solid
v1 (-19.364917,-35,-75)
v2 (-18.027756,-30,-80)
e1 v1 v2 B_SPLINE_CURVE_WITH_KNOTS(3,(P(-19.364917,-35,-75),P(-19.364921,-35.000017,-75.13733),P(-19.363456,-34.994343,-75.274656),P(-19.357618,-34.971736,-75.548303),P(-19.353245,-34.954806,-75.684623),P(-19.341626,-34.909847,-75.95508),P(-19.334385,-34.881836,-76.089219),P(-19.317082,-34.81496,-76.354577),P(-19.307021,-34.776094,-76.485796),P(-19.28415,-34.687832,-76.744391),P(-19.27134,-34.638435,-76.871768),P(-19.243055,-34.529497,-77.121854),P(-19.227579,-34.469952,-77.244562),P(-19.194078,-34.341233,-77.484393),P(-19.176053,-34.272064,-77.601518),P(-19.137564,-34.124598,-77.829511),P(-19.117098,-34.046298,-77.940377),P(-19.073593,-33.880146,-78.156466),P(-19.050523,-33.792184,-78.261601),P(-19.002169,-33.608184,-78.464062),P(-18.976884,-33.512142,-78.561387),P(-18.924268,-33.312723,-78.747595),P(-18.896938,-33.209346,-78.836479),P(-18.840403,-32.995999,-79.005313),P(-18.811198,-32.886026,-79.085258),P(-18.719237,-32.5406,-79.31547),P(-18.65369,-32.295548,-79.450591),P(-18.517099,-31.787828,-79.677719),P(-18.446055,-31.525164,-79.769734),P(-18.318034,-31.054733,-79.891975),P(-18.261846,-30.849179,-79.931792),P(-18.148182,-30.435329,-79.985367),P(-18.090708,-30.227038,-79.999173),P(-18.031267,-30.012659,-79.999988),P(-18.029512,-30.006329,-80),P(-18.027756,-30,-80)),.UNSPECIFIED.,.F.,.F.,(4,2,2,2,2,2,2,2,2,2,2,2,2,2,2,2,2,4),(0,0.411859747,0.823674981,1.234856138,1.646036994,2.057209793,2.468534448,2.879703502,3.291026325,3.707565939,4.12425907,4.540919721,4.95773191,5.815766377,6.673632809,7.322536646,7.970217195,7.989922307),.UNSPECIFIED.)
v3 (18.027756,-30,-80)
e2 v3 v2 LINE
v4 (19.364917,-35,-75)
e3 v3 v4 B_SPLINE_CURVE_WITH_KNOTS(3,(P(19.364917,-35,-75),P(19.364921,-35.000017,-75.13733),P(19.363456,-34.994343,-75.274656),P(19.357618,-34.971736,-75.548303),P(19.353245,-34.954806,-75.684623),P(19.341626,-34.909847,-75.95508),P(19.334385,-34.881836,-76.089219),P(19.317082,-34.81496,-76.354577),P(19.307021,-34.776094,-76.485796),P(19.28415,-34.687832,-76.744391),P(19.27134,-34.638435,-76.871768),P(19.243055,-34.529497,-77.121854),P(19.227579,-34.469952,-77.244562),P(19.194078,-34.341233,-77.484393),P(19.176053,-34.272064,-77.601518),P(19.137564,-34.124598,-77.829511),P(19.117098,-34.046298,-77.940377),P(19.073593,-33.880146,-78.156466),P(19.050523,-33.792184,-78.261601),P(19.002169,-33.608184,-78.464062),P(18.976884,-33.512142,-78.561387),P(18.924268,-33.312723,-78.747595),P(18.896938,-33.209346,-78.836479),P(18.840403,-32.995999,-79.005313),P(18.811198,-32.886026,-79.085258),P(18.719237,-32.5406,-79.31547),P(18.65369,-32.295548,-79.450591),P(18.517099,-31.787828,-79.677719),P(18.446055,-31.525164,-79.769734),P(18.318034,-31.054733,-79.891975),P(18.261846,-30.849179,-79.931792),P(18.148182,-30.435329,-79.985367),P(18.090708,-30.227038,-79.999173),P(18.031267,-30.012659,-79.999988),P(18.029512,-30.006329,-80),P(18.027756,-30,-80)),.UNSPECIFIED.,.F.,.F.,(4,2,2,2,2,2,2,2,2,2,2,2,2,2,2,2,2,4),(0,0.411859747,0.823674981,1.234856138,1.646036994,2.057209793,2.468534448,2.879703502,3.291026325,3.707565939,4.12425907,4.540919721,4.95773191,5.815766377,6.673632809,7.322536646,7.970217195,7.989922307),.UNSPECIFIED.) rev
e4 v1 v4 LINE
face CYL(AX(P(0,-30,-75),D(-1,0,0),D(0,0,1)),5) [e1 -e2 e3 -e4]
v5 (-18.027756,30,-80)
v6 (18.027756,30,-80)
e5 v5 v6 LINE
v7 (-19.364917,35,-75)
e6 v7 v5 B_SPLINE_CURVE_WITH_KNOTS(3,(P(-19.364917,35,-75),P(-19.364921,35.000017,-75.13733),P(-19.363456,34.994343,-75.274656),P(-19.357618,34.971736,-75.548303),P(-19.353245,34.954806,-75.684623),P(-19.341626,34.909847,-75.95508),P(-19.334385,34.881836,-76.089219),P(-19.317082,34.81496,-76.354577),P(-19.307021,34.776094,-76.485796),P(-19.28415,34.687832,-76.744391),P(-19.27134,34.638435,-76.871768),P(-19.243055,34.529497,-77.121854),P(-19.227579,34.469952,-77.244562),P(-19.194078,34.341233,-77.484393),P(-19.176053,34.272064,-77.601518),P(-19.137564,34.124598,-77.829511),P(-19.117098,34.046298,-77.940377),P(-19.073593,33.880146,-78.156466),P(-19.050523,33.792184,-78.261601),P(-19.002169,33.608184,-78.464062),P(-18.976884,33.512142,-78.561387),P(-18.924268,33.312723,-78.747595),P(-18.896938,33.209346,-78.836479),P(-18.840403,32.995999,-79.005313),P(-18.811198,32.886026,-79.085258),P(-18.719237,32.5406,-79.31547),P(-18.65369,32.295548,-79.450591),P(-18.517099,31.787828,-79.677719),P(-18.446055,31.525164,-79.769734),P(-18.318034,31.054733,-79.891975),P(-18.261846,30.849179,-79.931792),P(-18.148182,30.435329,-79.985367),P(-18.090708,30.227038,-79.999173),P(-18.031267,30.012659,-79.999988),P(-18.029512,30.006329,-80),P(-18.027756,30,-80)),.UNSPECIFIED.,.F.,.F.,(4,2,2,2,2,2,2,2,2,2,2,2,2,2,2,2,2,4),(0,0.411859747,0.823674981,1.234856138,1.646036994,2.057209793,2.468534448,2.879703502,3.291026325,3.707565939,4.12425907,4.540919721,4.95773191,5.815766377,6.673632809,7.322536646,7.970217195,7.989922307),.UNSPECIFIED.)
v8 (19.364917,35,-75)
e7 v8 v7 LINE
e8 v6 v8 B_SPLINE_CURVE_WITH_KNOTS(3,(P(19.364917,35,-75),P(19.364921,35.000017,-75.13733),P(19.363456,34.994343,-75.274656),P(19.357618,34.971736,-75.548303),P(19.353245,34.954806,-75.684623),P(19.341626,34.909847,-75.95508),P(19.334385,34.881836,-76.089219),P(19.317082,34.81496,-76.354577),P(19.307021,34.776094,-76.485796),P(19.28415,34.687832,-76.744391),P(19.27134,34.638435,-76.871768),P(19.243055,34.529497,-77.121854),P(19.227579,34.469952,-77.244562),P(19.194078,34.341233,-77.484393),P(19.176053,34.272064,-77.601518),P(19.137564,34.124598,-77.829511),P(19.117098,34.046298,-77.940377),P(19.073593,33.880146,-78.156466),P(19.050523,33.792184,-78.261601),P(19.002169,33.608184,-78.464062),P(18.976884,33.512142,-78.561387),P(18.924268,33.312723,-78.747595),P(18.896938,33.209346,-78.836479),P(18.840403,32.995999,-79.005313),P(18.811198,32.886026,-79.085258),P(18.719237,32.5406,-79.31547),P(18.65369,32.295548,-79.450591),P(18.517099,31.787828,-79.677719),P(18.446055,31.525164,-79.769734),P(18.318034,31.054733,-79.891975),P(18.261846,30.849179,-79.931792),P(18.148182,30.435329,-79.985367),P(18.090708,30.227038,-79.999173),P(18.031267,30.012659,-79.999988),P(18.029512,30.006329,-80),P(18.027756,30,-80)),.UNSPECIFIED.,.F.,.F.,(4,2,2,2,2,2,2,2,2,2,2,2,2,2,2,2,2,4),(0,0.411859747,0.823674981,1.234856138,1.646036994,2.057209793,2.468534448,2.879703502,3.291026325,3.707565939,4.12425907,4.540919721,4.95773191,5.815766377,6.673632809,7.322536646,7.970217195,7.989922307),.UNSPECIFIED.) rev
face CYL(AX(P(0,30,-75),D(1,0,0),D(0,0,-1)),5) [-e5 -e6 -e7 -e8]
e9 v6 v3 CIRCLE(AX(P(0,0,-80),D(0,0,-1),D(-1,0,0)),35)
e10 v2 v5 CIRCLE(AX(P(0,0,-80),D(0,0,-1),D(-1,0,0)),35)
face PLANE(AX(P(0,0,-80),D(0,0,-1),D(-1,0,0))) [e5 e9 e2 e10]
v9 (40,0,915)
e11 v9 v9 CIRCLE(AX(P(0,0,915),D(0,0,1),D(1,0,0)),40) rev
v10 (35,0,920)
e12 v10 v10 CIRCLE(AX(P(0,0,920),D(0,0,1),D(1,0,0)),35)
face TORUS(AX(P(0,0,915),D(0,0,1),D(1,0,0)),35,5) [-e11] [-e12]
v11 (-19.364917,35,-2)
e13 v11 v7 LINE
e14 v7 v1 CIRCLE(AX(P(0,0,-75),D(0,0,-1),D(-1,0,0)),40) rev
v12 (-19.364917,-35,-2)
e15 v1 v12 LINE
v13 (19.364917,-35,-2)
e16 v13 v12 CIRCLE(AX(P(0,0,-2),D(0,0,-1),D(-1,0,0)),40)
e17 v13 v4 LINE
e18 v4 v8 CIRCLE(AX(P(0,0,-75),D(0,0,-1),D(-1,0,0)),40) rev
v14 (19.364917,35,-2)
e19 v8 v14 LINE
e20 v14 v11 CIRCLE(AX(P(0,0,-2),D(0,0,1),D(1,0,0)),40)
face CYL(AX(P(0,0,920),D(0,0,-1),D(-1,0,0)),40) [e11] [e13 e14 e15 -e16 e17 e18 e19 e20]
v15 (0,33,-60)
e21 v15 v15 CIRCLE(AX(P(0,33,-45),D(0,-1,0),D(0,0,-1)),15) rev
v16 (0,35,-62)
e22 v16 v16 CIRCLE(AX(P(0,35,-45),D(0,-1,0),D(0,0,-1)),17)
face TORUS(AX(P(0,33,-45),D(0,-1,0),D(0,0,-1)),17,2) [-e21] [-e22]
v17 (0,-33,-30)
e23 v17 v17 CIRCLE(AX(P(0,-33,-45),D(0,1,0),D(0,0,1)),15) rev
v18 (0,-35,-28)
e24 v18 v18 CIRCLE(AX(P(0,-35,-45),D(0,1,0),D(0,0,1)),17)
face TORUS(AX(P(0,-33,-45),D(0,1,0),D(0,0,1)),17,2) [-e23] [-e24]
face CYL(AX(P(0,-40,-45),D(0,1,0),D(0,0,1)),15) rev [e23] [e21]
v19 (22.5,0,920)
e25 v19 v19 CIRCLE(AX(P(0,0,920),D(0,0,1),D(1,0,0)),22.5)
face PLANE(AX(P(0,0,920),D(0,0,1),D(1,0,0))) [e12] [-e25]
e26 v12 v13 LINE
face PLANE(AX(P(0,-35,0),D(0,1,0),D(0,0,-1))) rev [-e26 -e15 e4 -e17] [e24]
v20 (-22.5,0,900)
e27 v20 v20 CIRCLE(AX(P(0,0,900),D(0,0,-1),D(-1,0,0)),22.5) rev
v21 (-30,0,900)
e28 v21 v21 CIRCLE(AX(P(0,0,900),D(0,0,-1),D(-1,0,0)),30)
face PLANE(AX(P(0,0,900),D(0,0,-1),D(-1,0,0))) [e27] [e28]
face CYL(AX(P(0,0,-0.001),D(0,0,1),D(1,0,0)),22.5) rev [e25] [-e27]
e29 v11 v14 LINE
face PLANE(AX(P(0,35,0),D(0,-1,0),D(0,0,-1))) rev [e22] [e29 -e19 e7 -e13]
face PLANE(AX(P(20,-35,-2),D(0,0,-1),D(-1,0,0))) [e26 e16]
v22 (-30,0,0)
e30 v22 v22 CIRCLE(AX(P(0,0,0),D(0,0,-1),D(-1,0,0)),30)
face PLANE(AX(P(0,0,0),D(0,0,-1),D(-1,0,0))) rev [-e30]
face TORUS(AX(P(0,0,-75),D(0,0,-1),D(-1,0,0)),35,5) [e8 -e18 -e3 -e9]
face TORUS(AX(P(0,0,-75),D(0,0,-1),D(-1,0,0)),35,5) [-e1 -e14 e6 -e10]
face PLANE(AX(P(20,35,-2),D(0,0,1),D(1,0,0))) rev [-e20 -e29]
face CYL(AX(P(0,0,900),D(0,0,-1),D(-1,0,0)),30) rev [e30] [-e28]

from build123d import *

# Parameters (mm, degrees)
SKETCH2_R           = 40
BOSS_EXTRUDE1_DEPTH = 920
SKETCH3_R           = 30
CUT_EXTRUDE1_DEPTH  = 900
CUT_EXTRUDE2_REACH  = 923.737
SKETCH4_R           = 22.5
BOSS_EXTRUDE2_START = 80
SKETCH5_R           = 40
BOSS_EXTRUDE2_DEPTH = 80
SKETCH6_W           = 40
SKETCH6_H           = 78
CUT_EXTRUDE3_DEPTH  = 5
SKETCH7_R           = 15
CUT_EXTRUDE4_DEPTH  = 924.91828643
FILLET2_R           = 5
FILLET3_R           = 2


with BuildPart() as part:
    # Sketch2 → Boss-Extrude1 (new body)
    with BuildSketch(Plane.XY):
        Circle(SKETCH2_R)
    extrude(amount=BOSS_EXTRUDE1_DEPTH)

    # Sketch3 → Cut-Extrude1 (cut)
    with BuildSketch(Plane(origin=(0, 0, 0), x_dir=(-1, 0, 0), z_dir=(0, 0, -1))):
        Circle(SKETCH3_R)
    extrude(amount=-CUT_EXTRUDE1_DEPTH, mode=Mode.SUBTRACT)

    # Sketch4 → Cut-Extrude2 (cut, up to next)
    with BuildSketch(Plane.XY.offset(920), mode=Mode.PRIVATE) as cut_extrude2_sk1:
        Circle(SKETCH4_R)
    cut_extrude2_tool1 = extrude(cut_extrude2_sk1.sketch, amount=-CUT_EXTRUDE2_REACH, mode=Mode.PRIVATE) & part.part
    add(cut_extrude2_tool1.solids().sort_by_distance((0, 0, 920))[0], mode=Mode.SUBTRACT)

    # Sketch5 → Boss-Extrude2 (add)
    with BuildSketch(Plane(origin=(0, 0, 0), x_dir=(-1, 0, 0), z_dir=(0, 0, -1)).offset(BOSS_EXTRUDE2_START)):
        Circle(SKETCH5_R)
    extrude(amount=-BOSS_EXTRUDE2_DEPTH)

    # Sketch6 → Cut-Extrude3 (cut)
    with BuildSketch(Plane(origin=(0, 40, 0), x_dir=(1, 0, 0), z_dir=(0, 1, 0))):
        with Locations((0, 41)):
            Rectangle(SKETCH6_W, SKETCH6_H)
    cut_extrude3 = extrude(amount=-CUT_EXTRUDE3_DEPTH, mode=Mode.SUBTRACT)

    # Mirror1: Cut-Extrude3 across plane
    add(cut_extrude3.mirror(Plane.ZX), mode=Mode.SUBTRACT)

    # Sketch7 → Cut-Extrude4 (cut, through all)
    with BuildSketch(Plane(origin=(0, 35, 0), x_dir=(1, 0, 0), z_dir=(0, 1, 0))):
        with Locations(Location((0, 45, 0), (0, 0, 270))):
            Circle(SKETCH7_R)
    extrude(amount=-CUT_EXTRUDE4_DEPTH, mode=Mode.SUBTRACT)

    # Fillet2
    fillet2_edges = [part.edges().sort_by_distance(p)[0] for p in [
        (40, 0, -80),
        (0, 35, -80),
        (-34.457195687, 20.315060063, -80),
        (0, -35, -80),
        (-40, 0, 920),
    ]]
    fillet(fillet2_edges, radius=FILLET2_R - 0.0001)  # a hair under: the kernel refuses the full size

    # Fillet3
    fillet3_edges = [part.edges().sort_by_distance(p)[0] for p in [
        (0, -35, -60),
        (0, 35, -60),
    ]]
    fillet(fillet3_edges, radius=FILLET3_R)


solid = part.part
